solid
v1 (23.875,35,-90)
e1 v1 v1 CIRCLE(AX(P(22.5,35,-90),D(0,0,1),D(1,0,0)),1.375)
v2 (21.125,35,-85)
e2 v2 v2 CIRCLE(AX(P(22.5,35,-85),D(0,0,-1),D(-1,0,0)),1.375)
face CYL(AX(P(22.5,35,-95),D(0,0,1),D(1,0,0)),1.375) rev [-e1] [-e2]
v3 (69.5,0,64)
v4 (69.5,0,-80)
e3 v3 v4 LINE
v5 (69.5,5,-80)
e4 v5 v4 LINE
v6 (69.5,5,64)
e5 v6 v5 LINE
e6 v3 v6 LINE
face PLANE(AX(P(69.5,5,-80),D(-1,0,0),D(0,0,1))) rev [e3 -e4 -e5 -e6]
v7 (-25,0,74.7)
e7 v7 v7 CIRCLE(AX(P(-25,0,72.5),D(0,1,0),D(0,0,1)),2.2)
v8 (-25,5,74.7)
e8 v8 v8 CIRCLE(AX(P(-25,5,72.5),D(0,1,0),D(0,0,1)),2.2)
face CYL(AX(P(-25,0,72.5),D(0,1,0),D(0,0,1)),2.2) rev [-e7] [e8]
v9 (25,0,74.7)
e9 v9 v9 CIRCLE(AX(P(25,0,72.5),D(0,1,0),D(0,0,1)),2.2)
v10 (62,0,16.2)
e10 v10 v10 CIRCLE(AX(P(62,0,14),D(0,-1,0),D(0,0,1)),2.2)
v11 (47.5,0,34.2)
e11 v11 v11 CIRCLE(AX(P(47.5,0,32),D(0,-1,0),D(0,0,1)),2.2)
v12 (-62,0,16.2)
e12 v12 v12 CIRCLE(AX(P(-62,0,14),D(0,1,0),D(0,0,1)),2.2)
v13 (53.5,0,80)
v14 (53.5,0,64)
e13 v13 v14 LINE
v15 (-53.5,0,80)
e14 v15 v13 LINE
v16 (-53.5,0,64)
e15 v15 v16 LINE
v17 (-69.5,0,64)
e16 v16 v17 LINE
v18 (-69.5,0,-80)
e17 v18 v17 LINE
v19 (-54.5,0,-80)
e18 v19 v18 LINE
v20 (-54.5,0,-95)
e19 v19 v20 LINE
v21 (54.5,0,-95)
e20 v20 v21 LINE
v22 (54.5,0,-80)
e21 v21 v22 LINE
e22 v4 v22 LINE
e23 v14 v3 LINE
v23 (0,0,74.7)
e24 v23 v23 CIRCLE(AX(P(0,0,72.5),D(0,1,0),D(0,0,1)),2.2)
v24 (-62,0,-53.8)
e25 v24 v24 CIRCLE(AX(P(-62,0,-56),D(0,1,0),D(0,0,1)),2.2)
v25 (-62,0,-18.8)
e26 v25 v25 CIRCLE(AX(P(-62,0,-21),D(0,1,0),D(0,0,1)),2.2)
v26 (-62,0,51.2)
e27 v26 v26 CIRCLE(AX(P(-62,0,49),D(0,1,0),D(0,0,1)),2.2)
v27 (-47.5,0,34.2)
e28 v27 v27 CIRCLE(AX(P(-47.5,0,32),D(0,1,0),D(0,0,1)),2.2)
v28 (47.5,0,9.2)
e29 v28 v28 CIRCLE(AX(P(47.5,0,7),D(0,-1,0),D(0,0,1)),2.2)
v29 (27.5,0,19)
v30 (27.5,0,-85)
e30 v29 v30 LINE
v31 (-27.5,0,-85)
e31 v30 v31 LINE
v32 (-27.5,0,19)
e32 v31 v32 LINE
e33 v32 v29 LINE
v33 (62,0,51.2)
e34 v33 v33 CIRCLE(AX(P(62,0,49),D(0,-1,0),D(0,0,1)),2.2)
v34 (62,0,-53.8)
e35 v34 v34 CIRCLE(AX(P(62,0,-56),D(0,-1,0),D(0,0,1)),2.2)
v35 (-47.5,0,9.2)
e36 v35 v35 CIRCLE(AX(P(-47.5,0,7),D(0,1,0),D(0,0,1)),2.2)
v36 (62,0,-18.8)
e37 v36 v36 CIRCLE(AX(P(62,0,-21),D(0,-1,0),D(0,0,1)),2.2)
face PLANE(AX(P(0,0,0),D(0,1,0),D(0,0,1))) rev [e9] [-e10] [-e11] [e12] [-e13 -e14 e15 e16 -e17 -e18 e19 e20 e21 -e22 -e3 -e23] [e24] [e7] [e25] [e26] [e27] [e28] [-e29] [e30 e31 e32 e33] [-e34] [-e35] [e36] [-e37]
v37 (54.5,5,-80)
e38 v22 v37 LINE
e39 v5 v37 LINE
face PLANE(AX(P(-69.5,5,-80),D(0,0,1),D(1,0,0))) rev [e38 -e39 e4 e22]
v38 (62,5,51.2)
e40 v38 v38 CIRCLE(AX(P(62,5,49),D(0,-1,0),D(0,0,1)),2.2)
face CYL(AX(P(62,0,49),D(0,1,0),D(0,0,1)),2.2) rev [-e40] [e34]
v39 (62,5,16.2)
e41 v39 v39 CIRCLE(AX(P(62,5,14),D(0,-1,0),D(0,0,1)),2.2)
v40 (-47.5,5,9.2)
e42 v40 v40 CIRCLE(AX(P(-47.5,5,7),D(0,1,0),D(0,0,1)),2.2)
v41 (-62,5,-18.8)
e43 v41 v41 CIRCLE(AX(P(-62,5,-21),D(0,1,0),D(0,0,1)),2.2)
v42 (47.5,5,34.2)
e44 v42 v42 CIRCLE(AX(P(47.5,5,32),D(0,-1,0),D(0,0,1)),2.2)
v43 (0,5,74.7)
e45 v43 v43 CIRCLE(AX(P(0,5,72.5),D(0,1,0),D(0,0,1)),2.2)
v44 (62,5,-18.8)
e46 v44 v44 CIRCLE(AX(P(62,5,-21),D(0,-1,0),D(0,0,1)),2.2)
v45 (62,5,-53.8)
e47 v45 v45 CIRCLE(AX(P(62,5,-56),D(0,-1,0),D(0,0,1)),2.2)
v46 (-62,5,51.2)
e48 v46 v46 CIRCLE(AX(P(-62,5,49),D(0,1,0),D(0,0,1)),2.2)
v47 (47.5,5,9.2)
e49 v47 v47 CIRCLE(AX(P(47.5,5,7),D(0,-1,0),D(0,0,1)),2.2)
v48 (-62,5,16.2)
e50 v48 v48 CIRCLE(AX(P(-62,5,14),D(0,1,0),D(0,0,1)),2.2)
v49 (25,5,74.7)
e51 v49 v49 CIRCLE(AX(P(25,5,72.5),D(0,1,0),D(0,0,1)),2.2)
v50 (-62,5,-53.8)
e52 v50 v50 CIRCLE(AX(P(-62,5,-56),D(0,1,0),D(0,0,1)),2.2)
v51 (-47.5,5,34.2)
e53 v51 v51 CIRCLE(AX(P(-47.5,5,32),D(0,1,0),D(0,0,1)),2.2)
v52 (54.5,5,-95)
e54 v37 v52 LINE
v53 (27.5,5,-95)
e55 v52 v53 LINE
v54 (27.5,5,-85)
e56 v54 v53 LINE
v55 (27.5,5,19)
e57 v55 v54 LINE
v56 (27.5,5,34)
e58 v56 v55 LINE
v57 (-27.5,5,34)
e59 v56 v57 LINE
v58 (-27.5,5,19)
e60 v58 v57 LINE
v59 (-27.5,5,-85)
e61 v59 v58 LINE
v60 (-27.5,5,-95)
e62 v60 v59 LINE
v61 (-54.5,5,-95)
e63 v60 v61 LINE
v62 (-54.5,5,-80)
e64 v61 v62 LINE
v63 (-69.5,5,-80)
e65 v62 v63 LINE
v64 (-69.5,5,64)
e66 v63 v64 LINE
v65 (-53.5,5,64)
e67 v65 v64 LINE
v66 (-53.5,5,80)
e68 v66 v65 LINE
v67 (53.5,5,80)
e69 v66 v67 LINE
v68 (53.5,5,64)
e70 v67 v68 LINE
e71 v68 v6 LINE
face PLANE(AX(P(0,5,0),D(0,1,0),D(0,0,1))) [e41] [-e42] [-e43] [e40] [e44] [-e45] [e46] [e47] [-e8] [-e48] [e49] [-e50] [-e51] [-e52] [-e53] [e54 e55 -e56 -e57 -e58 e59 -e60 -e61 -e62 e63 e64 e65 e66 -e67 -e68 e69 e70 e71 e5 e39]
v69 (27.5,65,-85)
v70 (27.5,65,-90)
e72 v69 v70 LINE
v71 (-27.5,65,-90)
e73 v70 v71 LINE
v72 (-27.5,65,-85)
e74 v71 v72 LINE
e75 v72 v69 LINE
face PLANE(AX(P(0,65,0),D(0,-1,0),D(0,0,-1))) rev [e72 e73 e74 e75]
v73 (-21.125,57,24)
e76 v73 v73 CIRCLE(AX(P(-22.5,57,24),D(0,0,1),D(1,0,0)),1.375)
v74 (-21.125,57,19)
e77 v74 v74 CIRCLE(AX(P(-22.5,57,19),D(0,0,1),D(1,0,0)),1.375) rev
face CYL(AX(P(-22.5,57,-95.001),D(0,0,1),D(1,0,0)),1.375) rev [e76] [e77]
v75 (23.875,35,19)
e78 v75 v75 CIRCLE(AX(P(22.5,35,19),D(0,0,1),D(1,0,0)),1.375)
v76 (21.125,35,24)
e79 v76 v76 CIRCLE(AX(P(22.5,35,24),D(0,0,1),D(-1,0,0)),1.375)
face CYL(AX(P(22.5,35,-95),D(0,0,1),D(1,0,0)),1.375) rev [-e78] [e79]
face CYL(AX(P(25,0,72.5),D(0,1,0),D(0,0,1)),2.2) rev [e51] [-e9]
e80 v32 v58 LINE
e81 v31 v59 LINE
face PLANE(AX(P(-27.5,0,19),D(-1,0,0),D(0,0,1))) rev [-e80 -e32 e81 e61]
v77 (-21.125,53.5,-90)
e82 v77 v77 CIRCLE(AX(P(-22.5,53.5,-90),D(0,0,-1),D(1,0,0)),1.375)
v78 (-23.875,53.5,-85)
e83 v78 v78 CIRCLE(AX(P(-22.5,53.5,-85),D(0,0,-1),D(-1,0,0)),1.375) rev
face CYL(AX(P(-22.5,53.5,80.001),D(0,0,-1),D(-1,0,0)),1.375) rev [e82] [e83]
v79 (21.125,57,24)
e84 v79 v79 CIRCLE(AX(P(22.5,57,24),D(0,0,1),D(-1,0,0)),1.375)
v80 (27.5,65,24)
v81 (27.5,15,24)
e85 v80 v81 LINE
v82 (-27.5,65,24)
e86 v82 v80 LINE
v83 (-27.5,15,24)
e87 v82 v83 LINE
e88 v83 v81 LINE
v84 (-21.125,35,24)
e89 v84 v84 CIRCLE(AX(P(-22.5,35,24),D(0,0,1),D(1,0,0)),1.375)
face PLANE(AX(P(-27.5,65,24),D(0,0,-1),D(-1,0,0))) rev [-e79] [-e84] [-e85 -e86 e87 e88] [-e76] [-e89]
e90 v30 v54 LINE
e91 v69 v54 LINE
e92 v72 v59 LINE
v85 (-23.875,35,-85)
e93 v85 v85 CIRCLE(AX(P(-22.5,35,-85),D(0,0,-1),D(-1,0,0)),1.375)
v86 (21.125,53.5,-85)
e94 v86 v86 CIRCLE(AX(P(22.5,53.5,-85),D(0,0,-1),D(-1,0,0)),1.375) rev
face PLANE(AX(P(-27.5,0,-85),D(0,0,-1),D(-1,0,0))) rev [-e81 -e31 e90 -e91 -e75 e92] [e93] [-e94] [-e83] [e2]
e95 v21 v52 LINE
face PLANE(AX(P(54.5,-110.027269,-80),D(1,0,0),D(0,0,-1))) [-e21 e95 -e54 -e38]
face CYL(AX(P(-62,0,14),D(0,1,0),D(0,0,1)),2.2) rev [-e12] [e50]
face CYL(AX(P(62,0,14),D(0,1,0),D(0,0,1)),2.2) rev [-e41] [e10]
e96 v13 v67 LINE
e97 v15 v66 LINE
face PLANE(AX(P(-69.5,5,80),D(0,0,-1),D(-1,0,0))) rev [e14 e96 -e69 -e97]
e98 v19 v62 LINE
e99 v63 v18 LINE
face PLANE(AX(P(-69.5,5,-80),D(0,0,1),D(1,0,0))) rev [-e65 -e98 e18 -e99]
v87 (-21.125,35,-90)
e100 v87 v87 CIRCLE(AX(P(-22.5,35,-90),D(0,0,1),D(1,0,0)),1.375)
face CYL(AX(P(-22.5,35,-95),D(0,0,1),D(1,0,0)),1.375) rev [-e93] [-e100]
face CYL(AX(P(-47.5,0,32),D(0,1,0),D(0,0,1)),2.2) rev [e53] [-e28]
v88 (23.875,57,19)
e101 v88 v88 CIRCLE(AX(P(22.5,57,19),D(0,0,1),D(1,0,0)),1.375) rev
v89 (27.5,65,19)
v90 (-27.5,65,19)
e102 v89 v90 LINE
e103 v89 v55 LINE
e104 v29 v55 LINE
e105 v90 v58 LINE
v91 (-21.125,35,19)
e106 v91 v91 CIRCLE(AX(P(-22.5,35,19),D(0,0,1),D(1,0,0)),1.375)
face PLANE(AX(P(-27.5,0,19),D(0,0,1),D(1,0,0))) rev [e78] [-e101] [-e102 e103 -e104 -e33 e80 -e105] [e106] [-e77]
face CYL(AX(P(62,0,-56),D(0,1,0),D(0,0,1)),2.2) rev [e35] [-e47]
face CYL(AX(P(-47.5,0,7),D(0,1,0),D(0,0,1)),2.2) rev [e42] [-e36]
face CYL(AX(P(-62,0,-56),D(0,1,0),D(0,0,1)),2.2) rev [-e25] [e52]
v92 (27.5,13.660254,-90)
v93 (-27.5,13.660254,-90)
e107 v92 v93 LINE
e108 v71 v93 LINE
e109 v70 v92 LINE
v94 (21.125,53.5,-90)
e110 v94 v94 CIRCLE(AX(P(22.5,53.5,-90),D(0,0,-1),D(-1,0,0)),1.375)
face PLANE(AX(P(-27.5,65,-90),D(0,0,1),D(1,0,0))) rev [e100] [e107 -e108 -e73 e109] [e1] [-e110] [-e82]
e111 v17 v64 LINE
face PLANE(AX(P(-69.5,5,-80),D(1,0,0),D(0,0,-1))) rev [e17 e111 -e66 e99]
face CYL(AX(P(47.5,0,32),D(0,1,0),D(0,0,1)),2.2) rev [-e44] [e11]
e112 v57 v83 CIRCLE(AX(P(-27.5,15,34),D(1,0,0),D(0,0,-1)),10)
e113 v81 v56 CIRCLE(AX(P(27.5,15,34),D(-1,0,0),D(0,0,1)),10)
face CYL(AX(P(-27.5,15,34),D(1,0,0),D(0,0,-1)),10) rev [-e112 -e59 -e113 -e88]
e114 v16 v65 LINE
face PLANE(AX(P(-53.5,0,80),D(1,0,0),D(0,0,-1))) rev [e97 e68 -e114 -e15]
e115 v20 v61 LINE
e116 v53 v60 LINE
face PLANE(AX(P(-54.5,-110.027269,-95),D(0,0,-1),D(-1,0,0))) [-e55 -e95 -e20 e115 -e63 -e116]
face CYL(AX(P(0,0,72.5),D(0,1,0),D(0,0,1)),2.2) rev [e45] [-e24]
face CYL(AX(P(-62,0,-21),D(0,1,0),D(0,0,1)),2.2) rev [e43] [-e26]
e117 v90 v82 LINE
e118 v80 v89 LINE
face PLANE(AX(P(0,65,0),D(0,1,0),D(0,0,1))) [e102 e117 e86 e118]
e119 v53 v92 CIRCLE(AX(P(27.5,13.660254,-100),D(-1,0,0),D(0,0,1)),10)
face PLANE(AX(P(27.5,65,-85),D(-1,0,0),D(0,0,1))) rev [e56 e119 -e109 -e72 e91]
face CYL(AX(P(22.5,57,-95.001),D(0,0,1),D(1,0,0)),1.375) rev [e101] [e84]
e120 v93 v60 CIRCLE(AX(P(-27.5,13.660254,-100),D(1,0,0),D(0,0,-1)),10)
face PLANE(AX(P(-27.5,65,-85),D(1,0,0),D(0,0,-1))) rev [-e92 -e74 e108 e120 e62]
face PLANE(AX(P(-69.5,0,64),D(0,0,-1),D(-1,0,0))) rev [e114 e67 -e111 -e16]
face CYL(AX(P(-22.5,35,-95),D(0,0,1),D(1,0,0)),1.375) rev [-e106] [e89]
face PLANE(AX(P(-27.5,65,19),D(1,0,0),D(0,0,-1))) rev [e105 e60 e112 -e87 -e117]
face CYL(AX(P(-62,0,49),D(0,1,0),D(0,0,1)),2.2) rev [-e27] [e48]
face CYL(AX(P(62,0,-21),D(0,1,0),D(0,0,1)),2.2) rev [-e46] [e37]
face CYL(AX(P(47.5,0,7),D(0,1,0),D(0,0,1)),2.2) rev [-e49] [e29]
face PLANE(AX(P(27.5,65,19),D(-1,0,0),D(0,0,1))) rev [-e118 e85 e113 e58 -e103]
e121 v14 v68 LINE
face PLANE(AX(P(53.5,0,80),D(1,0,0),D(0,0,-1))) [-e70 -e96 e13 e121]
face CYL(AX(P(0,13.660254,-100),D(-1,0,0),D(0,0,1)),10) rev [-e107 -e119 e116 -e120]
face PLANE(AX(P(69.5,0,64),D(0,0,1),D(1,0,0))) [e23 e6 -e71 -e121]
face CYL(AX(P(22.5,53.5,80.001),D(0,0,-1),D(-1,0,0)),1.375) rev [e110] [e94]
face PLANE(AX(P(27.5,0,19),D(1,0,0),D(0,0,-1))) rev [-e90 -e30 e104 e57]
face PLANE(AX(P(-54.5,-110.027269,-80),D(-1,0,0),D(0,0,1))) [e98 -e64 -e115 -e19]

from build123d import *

# Parameters (mm, degrees)
SKETCH1_W               = 139
SKETCH1_H               = 160
BOSS_EXTRUDE1_DEPTH     = 5
SKETCH2_W               = 16
SKETCH2_H               = 16
CUT_EXTRUDE1_DEPTH      = 107.090763029
SKETCH3_R               = 2.2
CUT_EXTRUDE2_DEPTH      = 107.090763029
SKETCH4_R               = 2.2
CUT_EXTRUDE3_DEPTH      = 107.090763029
LPATTERN1_COUNT         = 4
LPATTERN1_PITCH         = 35
MIRROR2_COPY_1_SKETCH_R = 2.2
MIRROR2_COPY_1_DEPTH    = 107.090763029
MIRROR2_COPY_2_SKETCH_R = 2.2
MIRROR2_COPY_2_DEPTH    = 107.090763029
MIRROR2_COPY_3_SKETCH_R = 2.2
MIRROR2_COPY_3_DEPTH    = 107.090763029
SKETCH5_R               = 2.2
CUT_EXTRUDE4_DEPTH      = 107.090763029
SKETCH10_W              = 109
SKETCH10_H              = 15
BOSS_EXTRUDE2_DEPTH     = 5
SKETCH9_W               = 55
SKETCH9_H               = 104
CUT_EXTRUDE5_DEPTH      = 118.814472795
SKETCH11_W              = 55
SKETCH11_H              = 5
BOSS_EXTRUDE3_DEPTH     = 60
SKETCH12_R              = 1.375
CUT_EXTRUDE6_DEPTH      = 153.368796018
CUT_EXTRUDE7_REACH      = 154.369
SKETCH13_R              = 1.375
CUT_EXTRUDE8_REACH      = 196.821
SKETCH14_R              = 1.375
FILLET1_R               = 10
FILLET2_R               = 10


with BuildPart() as part:
    # Sketch1 → Boss-Extrude1 (new body)
    with BuildSketch(Plane(origin=(0, 0, 0), x_dir=(1, 0, 0), z_dir=(0, 1, 0))):
        Rectangle(SKETCH1_W, SKETCH1_H)
    extrude(amount=BOSS_EXTRUDE1_DEPTH)

    # Sketch2 → Cut-Extrude1 (cut, through all)
    with BuildSketch(Plane(origin=(0, 5, 0), x_dir=(1, 0, 0), z_dir=(0, 1, 0))):
        with Locations((-61.5, -72)):
            Rectangle(SKETCH2_W, SKETCH2_H)
    cut_extrude1 = extrude(amount=-CUT_EXTRUDE1_DEPTH, mode=Mode.SUBTRACT)

    # Mirror1: Cut-Extrude1 across plane
    add(cut_extrude1.mirror(Plane(origin=(0, 0, 0), x_dir=(0, 0, 1), z_dir=(1, 0, 0))), mode=Mode.SUBTRACT)

    # Sketch3 → Cut-Extrude2 (cut, through all)
    with BuildSketch(Plane(origin=(0, 5, 0), x_dir=(1, 0, 0), z_dir=(0, 1, 0))):
        with Locations(Location((0, -72.5, 0), (0, 0, 270))):
            Circle(SKETCH3_R)
        with Locations(Location((-25, -72.5, 0), (0, 0, 270))):
            Circle(SKETCH3_R)
        with Locations(Location((25, -72.5, 0), (0, 0, 270))):
            Circle(SKETCH3_R)
    extrude(amount=-CUT_EXTRUDE2_DEPTH, mode=Mode.SUBTRACT)

    # Sketch4 → Cut-Extrude3 (cut, through all)
    with BuildSketch(Plane(origin=(0, 5, 0), x_dir=(1, 0, 0), z_dir=(0, 1, 0))):
        with Locations(Location((-62, -49, 0), (0, 0, 270))):
            Circle(SKETCH4_R)
    cut_extrude3 = extrude(amount=-CUT_EXTRUDE3_DEPTH, mode=Mode.SUBTRACT)

    # LPattern1: Cut-Extrude3 ×4
    with Locations(*[(0, 0, -i * LPATTERN1_PITCH) for i in range(1, LPATTERN1_COUNT)]):
        add(cut_extrude3, mode=Mode.SUBTRACT)

    # Mirror2: Cut-Extrude3 across plane
    add(cut_extrude3.mirror(Plane(origin=(0, 0, 0), x_dir=(0, 0, 1), z_dir=(1, 0, 0))), mode=Mode.SUBTRACT)

    # Mirror2 copy 1 sketch → Mirror2 copy 1 (cut, through all)
    with BuildSketch(Plane(origin=(0, 5, -35), x_dir=(-1, 0, 0), z_dir=(0, 1, 0))):
        with Locations((-62, 49)):
            Circle(MIRROR2_COPY_1_SKETCH_R)
    extrude(amount=-MIRROR2_COPY_1_DEPTH, mode=Mode.SUBTRACT)

    # Mirror2 copy 2 sketch → Mirror2 copy 2 (cut, through all)
    with BuildSketch(Plane(origin=(0, 5, -70), x_dir=(-1, 0, 0), z_dir=(0, 1, 0))):
        with Locations((-62, 49)):
            Circle(MIRROR2_COPY_2_SKETCH_R)
    extrude(amount=-MIRROR2_COPY_2_DEPTH, mode=Mode.SUBTRACT)

    # Mirror2 copy 3 sketch → Mirror2 copy 3 (cut, through all)
    with BuildSketch(Plane(origin=(0, 5, -105), x_dir=(-1, 0, 0), z_dir=(0, 1, 0))):
        with Locations((-62, 49)):
            Circle(MIRROR2_COPY_3_SKETCH_R)
    extrude(amount=-MIRROR2_COPY_3_DEPTH, mode=Mode.SUBTRACT)

    # Sketch5 → Cut-Extrude4 (cut, through all)
    with BuildSketch(Plane(origin=(0, 5, 0), x_dir=(1, 0, 0), z_dir=(0, 1, 0))):
        with Locations(Location((-47.5, -32, 0), (0, 0, 270))):
            Circle(SKETCH5_R)
        with Locations(Location((-47.5, -7, 0), (0, 0, 270))):
            Circle(SKETCH5_R)
    cut_extrude4 = extrude(amount=-CUT_EXTRUDE4_DEPTH, mode=Mode.SUBTRACT)

    # Mirror3: Cut-Extrude4 across plane
    add(cut_extrude4.mirror(Plane(origin=(0, 0, 0), x_dir=(0, 0, 1), z_dir=(1, 0, 0))), mode=Mode.SUBTRACT)

    # Sketch10 → Boss-Extrude2 (add)
    with BuildSketch(Plane(origin=(0, 5, 0), x_dir=(1, 0, 0), z_dir=(0, 1, 0))):
        with Locations((0, 87.5)):
            Rectangle(SKETCH10_W, SKETCH10_H)
    extrude(amount=-BOSS_EXTRUDE2_DEPTH)

    # Sketch9 → Cut-Extrude5 (cut, through all)
    with BuildSketch(Plane(origin=(0, 5, 0), x_dir=(1, 0, 0), z_dir=(0, 1, 0))):
        with Locations((0, 33)):
            Rectangle(SKETCH9_W, SKETCH9_H)
    extrude(amount=-CUT_EXTRUDE5_DEPTH, mode=Mode.SUBTRACT)

    # Sketch11 → Boss-Extrude3 (add)
    with BuildSketch(Plane(origin=(0, 5, 0), x_dir=(1, 0, 0), z_dir=(0, 1, 0))):
        with Locations((0, 87.5)):
            Rectangle(SKETCH11_W, SKETCH11_H)
        with Locations((0, -21.5)):
            Rectangle(SKETCH11_W, SKETCH11_H)
    extrude(amount=BOSS_EXTRUDE3_DEPTH)

    # Sketch12 → Cut-Extrude6 (cut, through all)
    with BuildSketch(Plane.XY.offset(24)):
        with Locations((-22.5, 35)):
            Circle(SKETCH12_R)
        with Locations((22.5, 35)):
            Circle(SKETCH12_R)
    extrude(amount=-CUT_EXTRUDE6_DEPTH, mode=Mode.SUBTRACT)

    # Sketch13 → Cut-Extrude7 (cut, up to next)
    with BuildSketch(Plane.XY.offset(24), mode=Mode.PRIVATE) as cut_extrude7_sk1:
        with Locations((-22.5, 57)):
            Circle(SKETCH13_R)
    cut_extrude7_tool1 = extrude(cut_extrude7_sk1.sketch, amount=-CUT_EXTRUDE7_REACH, mode=Mode.PRIVATE) & part.part
    # Sketch13 → Cut-Extrude7 (cut, up to next)
    with BuildSketch(Plane.XY.offset(24), mode=Mode.PRIVATE) as cut_extrude7_sk2:
        with Locations((22.5, 57)):
            Circle(SKETCH13_R)
    cut_extrude7_tool2 = extrude(cut_extrude7_sk2.sketch, amount=-CUT_EXTRUDE7_REACH, mode=Mode.PRIVATE) & part.part
    add(cut_extrude7_tool1.solids().sort_by_distance((-22.5, 57, 24))[0], mode=Mode.SUBTRACT)
    add(cut_extrude7_tool2.solids().sort_by_distance((22.5, 57, 24))[0], mode=Mode.SUBTRACT)

    # Sketch14 → Cut-Extrude8 (cut, up to next)
    with BuildSketch(Plane(origin=(0, 0, -90), x_dir=(-1, 0, 0), z_dir=(0, 0, -1)), mode=Mode.PRIVATE) as cut_extrude8_sk1:
        with Locations((-22.5, 53.5)):
            Circle(SKETCH14_R)
    cut_extrude8_tool1 = extrude(cut_extrude8_sk1.sketch, amount=-CUT_EXTRUDE8_REACH, mode=Mode.PRIVATE) & part.part
    # Sketch14 → Cut-Extrude8 (cut, up to next)
    with BuildSketch(Plane(origin=(0, 0, -90), x_dir=(-1, 0, 0), z_dir=(0, 0, -1)), mode=Mode.PRIVATE) as cut_extrude8_sk2:
        with Locations((22.5, 53.5)):
            Circle(SKETCH14_R)
    cut_extrude8_tool2 = extrude(cut_extrude8_sk2.sketch, amount=-CUT_EXTRUDE8_REACH, mode=Mode.PRIVATE) & part.part
    add(cut_extrude8_tool1.solids().sort_by_distance((22.5, 53.5, -90))[0], mode=Mode.SUBTRACT)
    add(cut_extrude8_tool2.solids().sort_by_distance((-22.5, 53.5, -90))[0], mode=Mode.SUBTRACT)

    # Fillet1
    fillet1_edges = [part.edges().sort_by_distance(p)[0] for p in [
        (0, 5, 24),
    ]]
    fillet(fillet1_edges, radius=FILLET1_R)

    # Fillet2
    # the kernel refuses this fillet: 10 mm, written as the material it adds along each edge
    with BuildSketch(Plane(origin=(27.5, 5, -90), x_dir=(0, 0, -1), z_dir=(-1, 0, 0))) as fillet2_piece_1:
        with BuildLine():
            CenterArc((10, -8.660254038), FILLET2_R, 120, 60)
            Line((0, -8.660254038), (-0.2, -8.660254038))
            Line((-0.2, -8.660254038), (-0.2, 0))
            Line((-0.2, 0), (0, 0.2))
            ThreePointArc((0, 0.2), (2.5, 0.2), (4.9, 0.173205081))
            Line((4.9, 0.173205081), (5, 0))
        make_face()
    extrude(amount=55)


solid = part.part
